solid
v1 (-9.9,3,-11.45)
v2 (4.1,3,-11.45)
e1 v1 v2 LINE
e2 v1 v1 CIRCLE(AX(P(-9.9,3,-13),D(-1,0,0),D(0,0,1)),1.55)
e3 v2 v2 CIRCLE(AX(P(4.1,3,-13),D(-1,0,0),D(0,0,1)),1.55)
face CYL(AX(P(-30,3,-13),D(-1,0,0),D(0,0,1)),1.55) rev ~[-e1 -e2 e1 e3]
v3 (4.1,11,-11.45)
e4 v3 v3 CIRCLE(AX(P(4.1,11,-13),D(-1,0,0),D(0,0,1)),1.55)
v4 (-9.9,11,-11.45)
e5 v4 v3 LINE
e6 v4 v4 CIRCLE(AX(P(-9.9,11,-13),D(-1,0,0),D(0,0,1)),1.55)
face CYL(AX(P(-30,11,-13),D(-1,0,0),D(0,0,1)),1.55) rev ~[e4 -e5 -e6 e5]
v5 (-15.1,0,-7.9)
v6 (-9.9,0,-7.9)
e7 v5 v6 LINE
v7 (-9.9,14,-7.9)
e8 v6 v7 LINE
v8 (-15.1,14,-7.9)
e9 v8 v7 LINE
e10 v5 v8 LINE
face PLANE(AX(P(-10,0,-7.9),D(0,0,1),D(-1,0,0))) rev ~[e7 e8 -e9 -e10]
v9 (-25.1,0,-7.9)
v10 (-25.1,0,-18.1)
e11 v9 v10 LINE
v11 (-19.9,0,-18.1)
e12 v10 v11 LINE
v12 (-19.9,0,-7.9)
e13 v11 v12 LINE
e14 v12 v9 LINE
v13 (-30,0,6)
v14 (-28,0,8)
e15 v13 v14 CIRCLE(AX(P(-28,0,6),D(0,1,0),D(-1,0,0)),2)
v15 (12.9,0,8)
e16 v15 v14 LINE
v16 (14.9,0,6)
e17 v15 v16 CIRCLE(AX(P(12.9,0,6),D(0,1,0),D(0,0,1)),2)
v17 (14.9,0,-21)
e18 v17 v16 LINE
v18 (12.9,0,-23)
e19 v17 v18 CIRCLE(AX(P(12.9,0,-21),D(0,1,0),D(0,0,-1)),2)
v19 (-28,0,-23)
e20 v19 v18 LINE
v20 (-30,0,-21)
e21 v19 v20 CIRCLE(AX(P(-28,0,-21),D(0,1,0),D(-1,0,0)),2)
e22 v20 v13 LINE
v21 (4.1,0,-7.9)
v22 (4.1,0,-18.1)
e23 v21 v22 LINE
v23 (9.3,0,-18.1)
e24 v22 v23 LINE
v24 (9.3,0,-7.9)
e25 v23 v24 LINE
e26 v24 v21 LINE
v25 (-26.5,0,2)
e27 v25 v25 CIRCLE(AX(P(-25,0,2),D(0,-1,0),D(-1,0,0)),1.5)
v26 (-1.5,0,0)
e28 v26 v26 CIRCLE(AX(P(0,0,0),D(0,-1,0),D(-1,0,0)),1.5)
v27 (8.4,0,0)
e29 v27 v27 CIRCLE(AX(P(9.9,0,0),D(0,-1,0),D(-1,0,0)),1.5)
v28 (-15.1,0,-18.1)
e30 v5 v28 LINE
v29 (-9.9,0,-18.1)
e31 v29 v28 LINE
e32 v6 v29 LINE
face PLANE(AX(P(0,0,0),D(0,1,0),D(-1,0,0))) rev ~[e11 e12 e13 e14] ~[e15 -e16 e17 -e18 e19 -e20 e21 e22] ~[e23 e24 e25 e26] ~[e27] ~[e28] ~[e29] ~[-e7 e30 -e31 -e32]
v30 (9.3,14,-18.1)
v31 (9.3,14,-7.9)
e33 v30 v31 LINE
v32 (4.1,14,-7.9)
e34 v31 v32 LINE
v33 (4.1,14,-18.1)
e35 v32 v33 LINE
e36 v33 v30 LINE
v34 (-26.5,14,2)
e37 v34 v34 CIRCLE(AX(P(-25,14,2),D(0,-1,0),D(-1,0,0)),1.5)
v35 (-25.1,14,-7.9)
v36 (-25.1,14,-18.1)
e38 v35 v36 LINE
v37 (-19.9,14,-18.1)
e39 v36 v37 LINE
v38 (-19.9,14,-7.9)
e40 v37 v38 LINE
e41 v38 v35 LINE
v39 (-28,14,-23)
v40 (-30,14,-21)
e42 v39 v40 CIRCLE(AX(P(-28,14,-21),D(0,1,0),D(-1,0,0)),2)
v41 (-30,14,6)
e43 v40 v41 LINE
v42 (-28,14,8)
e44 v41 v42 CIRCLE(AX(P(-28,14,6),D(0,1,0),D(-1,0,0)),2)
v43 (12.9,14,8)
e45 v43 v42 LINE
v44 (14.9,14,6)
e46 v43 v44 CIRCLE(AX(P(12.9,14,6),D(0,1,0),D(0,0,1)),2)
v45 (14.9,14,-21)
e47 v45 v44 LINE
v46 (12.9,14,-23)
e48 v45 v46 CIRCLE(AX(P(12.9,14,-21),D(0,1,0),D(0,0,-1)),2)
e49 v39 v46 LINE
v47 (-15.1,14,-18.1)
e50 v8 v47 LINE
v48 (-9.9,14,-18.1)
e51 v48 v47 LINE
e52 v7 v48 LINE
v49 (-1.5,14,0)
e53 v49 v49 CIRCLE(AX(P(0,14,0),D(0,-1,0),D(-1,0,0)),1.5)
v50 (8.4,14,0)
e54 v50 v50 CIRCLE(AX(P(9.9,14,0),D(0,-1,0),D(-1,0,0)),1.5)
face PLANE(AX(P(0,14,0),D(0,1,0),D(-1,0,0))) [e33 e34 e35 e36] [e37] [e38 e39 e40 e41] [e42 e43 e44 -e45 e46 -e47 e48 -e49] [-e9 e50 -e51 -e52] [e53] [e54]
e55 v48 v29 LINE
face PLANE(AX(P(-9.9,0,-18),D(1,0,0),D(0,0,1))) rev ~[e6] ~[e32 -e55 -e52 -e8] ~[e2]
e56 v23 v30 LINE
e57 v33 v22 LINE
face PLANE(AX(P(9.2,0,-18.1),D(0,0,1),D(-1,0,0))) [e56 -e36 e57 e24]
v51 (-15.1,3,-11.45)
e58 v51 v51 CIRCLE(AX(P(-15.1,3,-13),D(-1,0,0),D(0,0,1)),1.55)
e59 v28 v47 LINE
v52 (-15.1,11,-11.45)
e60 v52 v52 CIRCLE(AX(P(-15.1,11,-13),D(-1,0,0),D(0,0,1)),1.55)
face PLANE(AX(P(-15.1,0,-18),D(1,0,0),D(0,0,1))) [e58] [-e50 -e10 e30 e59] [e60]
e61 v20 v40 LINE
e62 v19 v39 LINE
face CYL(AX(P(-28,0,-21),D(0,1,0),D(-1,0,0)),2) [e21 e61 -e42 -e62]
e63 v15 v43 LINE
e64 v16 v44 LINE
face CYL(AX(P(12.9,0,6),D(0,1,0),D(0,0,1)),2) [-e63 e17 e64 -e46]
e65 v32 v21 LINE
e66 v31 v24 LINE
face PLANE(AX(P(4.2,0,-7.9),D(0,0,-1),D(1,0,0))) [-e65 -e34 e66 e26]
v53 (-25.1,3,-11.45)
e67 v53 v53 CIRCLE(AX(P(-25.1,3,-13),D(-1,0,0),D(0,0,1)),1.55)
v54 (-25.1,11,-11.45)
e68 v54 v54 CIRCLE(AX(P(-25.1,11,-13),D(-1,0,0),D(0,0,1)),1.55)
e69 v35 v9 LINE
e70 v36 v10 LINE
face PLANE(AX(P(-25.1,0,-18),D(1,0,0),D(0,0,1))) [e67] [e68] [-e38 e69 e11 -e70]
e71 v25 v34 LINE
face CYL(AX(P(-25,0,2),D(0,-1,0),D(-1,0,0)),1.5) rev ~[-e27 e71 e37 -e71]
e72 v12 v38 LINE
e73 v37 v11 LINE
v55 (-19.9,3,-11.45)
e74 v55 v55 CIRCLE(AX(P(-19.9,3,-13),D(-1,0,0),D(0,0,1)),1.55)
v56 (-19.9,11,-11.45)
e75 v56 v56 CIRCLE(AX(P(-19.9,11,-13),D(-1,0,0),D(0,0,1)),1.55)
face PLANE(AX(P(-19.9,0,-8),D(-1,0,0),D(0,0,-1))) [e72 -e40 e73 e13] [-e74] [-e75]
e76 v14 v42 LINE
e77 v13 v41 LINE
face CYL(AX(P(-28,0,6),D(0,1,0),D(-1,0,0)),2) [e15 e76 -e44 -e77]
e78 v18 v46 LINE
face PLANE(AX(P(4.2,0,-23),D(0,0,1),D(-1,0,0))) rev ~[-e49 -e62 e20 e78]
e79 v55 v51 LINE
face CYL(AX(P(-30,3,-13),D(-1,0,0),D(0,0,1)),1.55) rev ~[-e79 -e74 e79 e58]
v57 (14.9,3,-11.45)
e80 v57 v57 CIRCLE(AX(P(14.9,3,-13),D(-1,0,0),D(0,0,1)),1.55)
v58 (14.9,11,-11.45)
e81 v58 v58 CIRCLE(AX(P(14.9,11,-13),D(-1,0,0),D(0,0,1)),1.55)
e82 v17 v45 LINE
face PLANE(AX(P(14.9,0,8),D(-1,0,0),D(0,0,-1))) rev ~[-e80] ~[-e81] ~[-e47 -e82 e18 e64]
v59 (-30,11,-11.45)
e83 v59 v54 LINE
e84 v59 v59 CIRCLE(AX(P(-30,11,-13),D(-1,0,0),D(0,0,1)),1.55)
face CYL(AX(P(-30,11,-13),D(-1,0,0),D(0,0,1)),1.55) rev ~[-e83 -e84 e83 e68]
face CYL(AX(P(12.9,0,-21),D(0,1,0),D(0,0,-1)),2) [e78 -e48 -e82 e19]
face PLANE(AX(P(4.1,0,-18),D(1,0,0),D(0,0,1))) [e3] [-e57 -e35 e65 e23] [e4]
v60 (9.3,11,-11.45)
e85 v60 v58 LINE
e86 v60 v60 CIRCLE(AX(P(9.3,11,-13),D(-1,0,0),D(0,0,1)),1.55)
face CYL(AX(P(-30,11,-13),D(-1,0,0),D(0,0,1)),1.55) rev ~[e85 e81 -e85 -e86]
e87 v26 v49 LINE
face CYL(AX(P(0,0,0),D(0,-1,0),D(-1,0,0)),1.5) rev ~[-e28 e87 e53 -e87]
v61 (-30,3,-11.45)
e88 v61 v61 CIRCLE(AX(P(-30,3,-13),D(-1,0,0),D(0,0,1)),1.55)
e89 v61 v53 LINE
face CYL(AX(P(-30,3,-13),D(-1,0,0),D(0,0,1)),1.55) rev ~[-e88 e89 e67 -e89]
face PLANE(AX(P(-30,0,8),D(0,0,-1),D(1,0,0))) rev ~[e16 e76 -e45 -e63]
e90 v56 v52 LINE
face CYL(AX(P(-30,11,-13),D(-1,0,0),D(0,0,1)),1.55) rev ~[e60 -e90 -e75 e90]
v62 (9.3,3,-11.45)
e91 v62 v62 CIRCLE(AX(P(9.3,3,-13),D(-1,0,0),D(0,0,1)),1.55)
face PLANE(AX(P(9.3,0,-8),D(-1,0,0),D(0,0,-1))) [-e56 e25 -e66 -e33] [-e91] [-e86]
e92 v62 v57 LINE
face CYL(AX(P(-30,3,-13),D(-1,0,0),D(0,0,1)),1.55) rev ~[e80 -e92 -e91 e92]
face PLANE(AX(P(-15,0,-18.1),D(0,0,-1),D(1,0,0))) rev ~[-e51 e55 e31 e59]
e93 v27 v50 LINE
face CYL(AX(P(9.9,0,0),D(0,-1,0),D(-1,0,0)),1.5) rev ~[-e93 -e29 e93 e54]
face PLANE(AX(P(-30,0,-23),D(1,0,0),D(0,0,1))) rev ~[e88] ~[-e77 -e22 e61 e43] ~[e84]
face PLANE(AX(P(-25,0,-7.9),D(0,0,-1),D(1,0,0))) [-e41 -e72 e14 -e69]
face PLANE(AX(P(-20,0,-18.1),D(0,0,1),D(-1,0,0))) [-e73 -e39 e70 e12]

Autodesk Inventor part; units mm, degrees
ref_plane "YZ Plane" through (0, 0, 0) normal (1, 0, 0) x (0, 1, 0)
ref_plane "XZ Plane" through (0, 0, 0) normal (0, 1, 0) x (-1, 0, 0)
ref_plane "XY Plane" through (0, 0, 0) normal (0, 0, 1) x (1, 0, 0)
sketch "Sketch1" plane through (0, 0, 0) normal (0, 1, 0) x (-1, 0, 0)
  circle A0 centre (0, 0) radius 1.5
  circle A1 centre (25, 2) radius 1.5
  line L0 (30, 8) -> (-14.9, 8)
  line L1 (-14.9, 8) -> (-14.9, -23)
  line L2 (-14.9, -23) -> (30, -23)
  line L3 (30, -23) -> (30, 8)
  line L4 (-14.9, -8) -> (30, -8) construction
  circle A2 centre (-9.9, 0) radius 1.5
  line L5 (25, -8) -> (20, -8)
  line L6 (20, -8) -> (20, -18)
  line L7 (20, -18) -> (25, -18)
  line L8 (25, -18) -> (25, -8)
  line L9 (20, -8) -> (20, -18)
  line L10 (20, -18) -> (15, -18)
  line L11 (15, -18) -> (15, -8)
  line L12 (15, -8) -> (20, -8)
  line L13 (15, -8) -> (15, -18)
  line L14 (15, -18) -> (10, -18)
  line L15 (10, -18) -> (10, -8)
  line L16 (10, -8) -> (15, -8)
  line L17 (-4.2, -23) -> (-14.9, -23)
  line L18 (-14.9, -23) -> (-14.9, -8)
  line L19 (-9.2, -8) -> (-9.2, -18)
  line L20 (-9.2, -18) -> (-4.2, -18)
  line L21 (-4.2, -18) -> (-4.2, -8)
  line L22 (-4.2, -8) -> (-9.2, -8)
  dimension "d0" = 3
  dimension "d1" = 3
  dimension "d3" = 25
  dimension "d4" = 2
  dimension "d5" = 8
  dimension "d6" = 6
  dimension "d7" = 5
  dimension "d9" = 3
  dimension "d10" = 9.9
  dimension "d11" = 5
  dimension "d12" = 10
  dimension "d13" = 5
  dimension "d14" = 5
  dimension "d15" = 5
  dimension "d16" = 5
  dimension "d37" = 5
  dimension "d38" = 14.2
  dimension "d39" = 5
extrude "Extrusion1" add sketch "Sketch1" along normal blind 14 contours L3 L2 L1 L0 | L6 L10 L11 L12
fillet "Fillet1" radius 2 4 edges at (-30, 7, 8) (-30, 7, -23) (14.9, 7, 8) (14.9, 7, -23)
sketch "Sketch2" plane through (-30, 0, -21) normal (-1, 0, 0) x (0, 0, 1)
  line L0 (3, 0) -> (13, 0) projected
  line L1 (13, 0) -> (13, 14) projected
  line L2 (3, 14) -> (13, 14) projected
  line L3 (3, 0) -> (3, 14) projected
  circle A0 centre (8, 11) radius 1.55
  circle A1 centre (8, 3) radius 1.55
  line L4 (3, 0) -> (3, 14) projected
  point P0 (21, 0)
  dimension "d21" = 3.1
  dimension "d22" = 3.1
  dimension "d23" = 3
  dimension "d24" = 3
  dimension "d35" = 5
  dimension "d36" = 5
extrude "Extrusion2" cut sketch "Sketch2" against normal blind 50 contours A0 | A1
thicken "Thicken1" operation add thickness 0.1 both sides no extend neighbours yes toward (1, 0, 0) faces at (-20, 8.0932, -9.2092) (-21.6667, 4.6667, -8) (-25, 8.0932, -9.2092) (-23.3333, 4.6667, -18)
thicken "Thicken2" operation add thickness 0.1 both sides no extend neighbours yes toward (0, 0, 1) faces at (-11.6667, 4.6667, -8) (-15, 8.0932, -9.2092) (-13.3333, 4.6667, -18) (-10, 5.9068, -16.7908)
thicken "Thicken3" operation add thickness 0.1 both sides no extend neighbours yes toward (-1, 0, 0) faces at (4.2, 8.0932, -16.7908) (5.8667, 4.6667, -18) (9.2, 5.9068, -16.7908) (7.5333, 4.6667, -8)
properties part number "Bar_connection_block"
